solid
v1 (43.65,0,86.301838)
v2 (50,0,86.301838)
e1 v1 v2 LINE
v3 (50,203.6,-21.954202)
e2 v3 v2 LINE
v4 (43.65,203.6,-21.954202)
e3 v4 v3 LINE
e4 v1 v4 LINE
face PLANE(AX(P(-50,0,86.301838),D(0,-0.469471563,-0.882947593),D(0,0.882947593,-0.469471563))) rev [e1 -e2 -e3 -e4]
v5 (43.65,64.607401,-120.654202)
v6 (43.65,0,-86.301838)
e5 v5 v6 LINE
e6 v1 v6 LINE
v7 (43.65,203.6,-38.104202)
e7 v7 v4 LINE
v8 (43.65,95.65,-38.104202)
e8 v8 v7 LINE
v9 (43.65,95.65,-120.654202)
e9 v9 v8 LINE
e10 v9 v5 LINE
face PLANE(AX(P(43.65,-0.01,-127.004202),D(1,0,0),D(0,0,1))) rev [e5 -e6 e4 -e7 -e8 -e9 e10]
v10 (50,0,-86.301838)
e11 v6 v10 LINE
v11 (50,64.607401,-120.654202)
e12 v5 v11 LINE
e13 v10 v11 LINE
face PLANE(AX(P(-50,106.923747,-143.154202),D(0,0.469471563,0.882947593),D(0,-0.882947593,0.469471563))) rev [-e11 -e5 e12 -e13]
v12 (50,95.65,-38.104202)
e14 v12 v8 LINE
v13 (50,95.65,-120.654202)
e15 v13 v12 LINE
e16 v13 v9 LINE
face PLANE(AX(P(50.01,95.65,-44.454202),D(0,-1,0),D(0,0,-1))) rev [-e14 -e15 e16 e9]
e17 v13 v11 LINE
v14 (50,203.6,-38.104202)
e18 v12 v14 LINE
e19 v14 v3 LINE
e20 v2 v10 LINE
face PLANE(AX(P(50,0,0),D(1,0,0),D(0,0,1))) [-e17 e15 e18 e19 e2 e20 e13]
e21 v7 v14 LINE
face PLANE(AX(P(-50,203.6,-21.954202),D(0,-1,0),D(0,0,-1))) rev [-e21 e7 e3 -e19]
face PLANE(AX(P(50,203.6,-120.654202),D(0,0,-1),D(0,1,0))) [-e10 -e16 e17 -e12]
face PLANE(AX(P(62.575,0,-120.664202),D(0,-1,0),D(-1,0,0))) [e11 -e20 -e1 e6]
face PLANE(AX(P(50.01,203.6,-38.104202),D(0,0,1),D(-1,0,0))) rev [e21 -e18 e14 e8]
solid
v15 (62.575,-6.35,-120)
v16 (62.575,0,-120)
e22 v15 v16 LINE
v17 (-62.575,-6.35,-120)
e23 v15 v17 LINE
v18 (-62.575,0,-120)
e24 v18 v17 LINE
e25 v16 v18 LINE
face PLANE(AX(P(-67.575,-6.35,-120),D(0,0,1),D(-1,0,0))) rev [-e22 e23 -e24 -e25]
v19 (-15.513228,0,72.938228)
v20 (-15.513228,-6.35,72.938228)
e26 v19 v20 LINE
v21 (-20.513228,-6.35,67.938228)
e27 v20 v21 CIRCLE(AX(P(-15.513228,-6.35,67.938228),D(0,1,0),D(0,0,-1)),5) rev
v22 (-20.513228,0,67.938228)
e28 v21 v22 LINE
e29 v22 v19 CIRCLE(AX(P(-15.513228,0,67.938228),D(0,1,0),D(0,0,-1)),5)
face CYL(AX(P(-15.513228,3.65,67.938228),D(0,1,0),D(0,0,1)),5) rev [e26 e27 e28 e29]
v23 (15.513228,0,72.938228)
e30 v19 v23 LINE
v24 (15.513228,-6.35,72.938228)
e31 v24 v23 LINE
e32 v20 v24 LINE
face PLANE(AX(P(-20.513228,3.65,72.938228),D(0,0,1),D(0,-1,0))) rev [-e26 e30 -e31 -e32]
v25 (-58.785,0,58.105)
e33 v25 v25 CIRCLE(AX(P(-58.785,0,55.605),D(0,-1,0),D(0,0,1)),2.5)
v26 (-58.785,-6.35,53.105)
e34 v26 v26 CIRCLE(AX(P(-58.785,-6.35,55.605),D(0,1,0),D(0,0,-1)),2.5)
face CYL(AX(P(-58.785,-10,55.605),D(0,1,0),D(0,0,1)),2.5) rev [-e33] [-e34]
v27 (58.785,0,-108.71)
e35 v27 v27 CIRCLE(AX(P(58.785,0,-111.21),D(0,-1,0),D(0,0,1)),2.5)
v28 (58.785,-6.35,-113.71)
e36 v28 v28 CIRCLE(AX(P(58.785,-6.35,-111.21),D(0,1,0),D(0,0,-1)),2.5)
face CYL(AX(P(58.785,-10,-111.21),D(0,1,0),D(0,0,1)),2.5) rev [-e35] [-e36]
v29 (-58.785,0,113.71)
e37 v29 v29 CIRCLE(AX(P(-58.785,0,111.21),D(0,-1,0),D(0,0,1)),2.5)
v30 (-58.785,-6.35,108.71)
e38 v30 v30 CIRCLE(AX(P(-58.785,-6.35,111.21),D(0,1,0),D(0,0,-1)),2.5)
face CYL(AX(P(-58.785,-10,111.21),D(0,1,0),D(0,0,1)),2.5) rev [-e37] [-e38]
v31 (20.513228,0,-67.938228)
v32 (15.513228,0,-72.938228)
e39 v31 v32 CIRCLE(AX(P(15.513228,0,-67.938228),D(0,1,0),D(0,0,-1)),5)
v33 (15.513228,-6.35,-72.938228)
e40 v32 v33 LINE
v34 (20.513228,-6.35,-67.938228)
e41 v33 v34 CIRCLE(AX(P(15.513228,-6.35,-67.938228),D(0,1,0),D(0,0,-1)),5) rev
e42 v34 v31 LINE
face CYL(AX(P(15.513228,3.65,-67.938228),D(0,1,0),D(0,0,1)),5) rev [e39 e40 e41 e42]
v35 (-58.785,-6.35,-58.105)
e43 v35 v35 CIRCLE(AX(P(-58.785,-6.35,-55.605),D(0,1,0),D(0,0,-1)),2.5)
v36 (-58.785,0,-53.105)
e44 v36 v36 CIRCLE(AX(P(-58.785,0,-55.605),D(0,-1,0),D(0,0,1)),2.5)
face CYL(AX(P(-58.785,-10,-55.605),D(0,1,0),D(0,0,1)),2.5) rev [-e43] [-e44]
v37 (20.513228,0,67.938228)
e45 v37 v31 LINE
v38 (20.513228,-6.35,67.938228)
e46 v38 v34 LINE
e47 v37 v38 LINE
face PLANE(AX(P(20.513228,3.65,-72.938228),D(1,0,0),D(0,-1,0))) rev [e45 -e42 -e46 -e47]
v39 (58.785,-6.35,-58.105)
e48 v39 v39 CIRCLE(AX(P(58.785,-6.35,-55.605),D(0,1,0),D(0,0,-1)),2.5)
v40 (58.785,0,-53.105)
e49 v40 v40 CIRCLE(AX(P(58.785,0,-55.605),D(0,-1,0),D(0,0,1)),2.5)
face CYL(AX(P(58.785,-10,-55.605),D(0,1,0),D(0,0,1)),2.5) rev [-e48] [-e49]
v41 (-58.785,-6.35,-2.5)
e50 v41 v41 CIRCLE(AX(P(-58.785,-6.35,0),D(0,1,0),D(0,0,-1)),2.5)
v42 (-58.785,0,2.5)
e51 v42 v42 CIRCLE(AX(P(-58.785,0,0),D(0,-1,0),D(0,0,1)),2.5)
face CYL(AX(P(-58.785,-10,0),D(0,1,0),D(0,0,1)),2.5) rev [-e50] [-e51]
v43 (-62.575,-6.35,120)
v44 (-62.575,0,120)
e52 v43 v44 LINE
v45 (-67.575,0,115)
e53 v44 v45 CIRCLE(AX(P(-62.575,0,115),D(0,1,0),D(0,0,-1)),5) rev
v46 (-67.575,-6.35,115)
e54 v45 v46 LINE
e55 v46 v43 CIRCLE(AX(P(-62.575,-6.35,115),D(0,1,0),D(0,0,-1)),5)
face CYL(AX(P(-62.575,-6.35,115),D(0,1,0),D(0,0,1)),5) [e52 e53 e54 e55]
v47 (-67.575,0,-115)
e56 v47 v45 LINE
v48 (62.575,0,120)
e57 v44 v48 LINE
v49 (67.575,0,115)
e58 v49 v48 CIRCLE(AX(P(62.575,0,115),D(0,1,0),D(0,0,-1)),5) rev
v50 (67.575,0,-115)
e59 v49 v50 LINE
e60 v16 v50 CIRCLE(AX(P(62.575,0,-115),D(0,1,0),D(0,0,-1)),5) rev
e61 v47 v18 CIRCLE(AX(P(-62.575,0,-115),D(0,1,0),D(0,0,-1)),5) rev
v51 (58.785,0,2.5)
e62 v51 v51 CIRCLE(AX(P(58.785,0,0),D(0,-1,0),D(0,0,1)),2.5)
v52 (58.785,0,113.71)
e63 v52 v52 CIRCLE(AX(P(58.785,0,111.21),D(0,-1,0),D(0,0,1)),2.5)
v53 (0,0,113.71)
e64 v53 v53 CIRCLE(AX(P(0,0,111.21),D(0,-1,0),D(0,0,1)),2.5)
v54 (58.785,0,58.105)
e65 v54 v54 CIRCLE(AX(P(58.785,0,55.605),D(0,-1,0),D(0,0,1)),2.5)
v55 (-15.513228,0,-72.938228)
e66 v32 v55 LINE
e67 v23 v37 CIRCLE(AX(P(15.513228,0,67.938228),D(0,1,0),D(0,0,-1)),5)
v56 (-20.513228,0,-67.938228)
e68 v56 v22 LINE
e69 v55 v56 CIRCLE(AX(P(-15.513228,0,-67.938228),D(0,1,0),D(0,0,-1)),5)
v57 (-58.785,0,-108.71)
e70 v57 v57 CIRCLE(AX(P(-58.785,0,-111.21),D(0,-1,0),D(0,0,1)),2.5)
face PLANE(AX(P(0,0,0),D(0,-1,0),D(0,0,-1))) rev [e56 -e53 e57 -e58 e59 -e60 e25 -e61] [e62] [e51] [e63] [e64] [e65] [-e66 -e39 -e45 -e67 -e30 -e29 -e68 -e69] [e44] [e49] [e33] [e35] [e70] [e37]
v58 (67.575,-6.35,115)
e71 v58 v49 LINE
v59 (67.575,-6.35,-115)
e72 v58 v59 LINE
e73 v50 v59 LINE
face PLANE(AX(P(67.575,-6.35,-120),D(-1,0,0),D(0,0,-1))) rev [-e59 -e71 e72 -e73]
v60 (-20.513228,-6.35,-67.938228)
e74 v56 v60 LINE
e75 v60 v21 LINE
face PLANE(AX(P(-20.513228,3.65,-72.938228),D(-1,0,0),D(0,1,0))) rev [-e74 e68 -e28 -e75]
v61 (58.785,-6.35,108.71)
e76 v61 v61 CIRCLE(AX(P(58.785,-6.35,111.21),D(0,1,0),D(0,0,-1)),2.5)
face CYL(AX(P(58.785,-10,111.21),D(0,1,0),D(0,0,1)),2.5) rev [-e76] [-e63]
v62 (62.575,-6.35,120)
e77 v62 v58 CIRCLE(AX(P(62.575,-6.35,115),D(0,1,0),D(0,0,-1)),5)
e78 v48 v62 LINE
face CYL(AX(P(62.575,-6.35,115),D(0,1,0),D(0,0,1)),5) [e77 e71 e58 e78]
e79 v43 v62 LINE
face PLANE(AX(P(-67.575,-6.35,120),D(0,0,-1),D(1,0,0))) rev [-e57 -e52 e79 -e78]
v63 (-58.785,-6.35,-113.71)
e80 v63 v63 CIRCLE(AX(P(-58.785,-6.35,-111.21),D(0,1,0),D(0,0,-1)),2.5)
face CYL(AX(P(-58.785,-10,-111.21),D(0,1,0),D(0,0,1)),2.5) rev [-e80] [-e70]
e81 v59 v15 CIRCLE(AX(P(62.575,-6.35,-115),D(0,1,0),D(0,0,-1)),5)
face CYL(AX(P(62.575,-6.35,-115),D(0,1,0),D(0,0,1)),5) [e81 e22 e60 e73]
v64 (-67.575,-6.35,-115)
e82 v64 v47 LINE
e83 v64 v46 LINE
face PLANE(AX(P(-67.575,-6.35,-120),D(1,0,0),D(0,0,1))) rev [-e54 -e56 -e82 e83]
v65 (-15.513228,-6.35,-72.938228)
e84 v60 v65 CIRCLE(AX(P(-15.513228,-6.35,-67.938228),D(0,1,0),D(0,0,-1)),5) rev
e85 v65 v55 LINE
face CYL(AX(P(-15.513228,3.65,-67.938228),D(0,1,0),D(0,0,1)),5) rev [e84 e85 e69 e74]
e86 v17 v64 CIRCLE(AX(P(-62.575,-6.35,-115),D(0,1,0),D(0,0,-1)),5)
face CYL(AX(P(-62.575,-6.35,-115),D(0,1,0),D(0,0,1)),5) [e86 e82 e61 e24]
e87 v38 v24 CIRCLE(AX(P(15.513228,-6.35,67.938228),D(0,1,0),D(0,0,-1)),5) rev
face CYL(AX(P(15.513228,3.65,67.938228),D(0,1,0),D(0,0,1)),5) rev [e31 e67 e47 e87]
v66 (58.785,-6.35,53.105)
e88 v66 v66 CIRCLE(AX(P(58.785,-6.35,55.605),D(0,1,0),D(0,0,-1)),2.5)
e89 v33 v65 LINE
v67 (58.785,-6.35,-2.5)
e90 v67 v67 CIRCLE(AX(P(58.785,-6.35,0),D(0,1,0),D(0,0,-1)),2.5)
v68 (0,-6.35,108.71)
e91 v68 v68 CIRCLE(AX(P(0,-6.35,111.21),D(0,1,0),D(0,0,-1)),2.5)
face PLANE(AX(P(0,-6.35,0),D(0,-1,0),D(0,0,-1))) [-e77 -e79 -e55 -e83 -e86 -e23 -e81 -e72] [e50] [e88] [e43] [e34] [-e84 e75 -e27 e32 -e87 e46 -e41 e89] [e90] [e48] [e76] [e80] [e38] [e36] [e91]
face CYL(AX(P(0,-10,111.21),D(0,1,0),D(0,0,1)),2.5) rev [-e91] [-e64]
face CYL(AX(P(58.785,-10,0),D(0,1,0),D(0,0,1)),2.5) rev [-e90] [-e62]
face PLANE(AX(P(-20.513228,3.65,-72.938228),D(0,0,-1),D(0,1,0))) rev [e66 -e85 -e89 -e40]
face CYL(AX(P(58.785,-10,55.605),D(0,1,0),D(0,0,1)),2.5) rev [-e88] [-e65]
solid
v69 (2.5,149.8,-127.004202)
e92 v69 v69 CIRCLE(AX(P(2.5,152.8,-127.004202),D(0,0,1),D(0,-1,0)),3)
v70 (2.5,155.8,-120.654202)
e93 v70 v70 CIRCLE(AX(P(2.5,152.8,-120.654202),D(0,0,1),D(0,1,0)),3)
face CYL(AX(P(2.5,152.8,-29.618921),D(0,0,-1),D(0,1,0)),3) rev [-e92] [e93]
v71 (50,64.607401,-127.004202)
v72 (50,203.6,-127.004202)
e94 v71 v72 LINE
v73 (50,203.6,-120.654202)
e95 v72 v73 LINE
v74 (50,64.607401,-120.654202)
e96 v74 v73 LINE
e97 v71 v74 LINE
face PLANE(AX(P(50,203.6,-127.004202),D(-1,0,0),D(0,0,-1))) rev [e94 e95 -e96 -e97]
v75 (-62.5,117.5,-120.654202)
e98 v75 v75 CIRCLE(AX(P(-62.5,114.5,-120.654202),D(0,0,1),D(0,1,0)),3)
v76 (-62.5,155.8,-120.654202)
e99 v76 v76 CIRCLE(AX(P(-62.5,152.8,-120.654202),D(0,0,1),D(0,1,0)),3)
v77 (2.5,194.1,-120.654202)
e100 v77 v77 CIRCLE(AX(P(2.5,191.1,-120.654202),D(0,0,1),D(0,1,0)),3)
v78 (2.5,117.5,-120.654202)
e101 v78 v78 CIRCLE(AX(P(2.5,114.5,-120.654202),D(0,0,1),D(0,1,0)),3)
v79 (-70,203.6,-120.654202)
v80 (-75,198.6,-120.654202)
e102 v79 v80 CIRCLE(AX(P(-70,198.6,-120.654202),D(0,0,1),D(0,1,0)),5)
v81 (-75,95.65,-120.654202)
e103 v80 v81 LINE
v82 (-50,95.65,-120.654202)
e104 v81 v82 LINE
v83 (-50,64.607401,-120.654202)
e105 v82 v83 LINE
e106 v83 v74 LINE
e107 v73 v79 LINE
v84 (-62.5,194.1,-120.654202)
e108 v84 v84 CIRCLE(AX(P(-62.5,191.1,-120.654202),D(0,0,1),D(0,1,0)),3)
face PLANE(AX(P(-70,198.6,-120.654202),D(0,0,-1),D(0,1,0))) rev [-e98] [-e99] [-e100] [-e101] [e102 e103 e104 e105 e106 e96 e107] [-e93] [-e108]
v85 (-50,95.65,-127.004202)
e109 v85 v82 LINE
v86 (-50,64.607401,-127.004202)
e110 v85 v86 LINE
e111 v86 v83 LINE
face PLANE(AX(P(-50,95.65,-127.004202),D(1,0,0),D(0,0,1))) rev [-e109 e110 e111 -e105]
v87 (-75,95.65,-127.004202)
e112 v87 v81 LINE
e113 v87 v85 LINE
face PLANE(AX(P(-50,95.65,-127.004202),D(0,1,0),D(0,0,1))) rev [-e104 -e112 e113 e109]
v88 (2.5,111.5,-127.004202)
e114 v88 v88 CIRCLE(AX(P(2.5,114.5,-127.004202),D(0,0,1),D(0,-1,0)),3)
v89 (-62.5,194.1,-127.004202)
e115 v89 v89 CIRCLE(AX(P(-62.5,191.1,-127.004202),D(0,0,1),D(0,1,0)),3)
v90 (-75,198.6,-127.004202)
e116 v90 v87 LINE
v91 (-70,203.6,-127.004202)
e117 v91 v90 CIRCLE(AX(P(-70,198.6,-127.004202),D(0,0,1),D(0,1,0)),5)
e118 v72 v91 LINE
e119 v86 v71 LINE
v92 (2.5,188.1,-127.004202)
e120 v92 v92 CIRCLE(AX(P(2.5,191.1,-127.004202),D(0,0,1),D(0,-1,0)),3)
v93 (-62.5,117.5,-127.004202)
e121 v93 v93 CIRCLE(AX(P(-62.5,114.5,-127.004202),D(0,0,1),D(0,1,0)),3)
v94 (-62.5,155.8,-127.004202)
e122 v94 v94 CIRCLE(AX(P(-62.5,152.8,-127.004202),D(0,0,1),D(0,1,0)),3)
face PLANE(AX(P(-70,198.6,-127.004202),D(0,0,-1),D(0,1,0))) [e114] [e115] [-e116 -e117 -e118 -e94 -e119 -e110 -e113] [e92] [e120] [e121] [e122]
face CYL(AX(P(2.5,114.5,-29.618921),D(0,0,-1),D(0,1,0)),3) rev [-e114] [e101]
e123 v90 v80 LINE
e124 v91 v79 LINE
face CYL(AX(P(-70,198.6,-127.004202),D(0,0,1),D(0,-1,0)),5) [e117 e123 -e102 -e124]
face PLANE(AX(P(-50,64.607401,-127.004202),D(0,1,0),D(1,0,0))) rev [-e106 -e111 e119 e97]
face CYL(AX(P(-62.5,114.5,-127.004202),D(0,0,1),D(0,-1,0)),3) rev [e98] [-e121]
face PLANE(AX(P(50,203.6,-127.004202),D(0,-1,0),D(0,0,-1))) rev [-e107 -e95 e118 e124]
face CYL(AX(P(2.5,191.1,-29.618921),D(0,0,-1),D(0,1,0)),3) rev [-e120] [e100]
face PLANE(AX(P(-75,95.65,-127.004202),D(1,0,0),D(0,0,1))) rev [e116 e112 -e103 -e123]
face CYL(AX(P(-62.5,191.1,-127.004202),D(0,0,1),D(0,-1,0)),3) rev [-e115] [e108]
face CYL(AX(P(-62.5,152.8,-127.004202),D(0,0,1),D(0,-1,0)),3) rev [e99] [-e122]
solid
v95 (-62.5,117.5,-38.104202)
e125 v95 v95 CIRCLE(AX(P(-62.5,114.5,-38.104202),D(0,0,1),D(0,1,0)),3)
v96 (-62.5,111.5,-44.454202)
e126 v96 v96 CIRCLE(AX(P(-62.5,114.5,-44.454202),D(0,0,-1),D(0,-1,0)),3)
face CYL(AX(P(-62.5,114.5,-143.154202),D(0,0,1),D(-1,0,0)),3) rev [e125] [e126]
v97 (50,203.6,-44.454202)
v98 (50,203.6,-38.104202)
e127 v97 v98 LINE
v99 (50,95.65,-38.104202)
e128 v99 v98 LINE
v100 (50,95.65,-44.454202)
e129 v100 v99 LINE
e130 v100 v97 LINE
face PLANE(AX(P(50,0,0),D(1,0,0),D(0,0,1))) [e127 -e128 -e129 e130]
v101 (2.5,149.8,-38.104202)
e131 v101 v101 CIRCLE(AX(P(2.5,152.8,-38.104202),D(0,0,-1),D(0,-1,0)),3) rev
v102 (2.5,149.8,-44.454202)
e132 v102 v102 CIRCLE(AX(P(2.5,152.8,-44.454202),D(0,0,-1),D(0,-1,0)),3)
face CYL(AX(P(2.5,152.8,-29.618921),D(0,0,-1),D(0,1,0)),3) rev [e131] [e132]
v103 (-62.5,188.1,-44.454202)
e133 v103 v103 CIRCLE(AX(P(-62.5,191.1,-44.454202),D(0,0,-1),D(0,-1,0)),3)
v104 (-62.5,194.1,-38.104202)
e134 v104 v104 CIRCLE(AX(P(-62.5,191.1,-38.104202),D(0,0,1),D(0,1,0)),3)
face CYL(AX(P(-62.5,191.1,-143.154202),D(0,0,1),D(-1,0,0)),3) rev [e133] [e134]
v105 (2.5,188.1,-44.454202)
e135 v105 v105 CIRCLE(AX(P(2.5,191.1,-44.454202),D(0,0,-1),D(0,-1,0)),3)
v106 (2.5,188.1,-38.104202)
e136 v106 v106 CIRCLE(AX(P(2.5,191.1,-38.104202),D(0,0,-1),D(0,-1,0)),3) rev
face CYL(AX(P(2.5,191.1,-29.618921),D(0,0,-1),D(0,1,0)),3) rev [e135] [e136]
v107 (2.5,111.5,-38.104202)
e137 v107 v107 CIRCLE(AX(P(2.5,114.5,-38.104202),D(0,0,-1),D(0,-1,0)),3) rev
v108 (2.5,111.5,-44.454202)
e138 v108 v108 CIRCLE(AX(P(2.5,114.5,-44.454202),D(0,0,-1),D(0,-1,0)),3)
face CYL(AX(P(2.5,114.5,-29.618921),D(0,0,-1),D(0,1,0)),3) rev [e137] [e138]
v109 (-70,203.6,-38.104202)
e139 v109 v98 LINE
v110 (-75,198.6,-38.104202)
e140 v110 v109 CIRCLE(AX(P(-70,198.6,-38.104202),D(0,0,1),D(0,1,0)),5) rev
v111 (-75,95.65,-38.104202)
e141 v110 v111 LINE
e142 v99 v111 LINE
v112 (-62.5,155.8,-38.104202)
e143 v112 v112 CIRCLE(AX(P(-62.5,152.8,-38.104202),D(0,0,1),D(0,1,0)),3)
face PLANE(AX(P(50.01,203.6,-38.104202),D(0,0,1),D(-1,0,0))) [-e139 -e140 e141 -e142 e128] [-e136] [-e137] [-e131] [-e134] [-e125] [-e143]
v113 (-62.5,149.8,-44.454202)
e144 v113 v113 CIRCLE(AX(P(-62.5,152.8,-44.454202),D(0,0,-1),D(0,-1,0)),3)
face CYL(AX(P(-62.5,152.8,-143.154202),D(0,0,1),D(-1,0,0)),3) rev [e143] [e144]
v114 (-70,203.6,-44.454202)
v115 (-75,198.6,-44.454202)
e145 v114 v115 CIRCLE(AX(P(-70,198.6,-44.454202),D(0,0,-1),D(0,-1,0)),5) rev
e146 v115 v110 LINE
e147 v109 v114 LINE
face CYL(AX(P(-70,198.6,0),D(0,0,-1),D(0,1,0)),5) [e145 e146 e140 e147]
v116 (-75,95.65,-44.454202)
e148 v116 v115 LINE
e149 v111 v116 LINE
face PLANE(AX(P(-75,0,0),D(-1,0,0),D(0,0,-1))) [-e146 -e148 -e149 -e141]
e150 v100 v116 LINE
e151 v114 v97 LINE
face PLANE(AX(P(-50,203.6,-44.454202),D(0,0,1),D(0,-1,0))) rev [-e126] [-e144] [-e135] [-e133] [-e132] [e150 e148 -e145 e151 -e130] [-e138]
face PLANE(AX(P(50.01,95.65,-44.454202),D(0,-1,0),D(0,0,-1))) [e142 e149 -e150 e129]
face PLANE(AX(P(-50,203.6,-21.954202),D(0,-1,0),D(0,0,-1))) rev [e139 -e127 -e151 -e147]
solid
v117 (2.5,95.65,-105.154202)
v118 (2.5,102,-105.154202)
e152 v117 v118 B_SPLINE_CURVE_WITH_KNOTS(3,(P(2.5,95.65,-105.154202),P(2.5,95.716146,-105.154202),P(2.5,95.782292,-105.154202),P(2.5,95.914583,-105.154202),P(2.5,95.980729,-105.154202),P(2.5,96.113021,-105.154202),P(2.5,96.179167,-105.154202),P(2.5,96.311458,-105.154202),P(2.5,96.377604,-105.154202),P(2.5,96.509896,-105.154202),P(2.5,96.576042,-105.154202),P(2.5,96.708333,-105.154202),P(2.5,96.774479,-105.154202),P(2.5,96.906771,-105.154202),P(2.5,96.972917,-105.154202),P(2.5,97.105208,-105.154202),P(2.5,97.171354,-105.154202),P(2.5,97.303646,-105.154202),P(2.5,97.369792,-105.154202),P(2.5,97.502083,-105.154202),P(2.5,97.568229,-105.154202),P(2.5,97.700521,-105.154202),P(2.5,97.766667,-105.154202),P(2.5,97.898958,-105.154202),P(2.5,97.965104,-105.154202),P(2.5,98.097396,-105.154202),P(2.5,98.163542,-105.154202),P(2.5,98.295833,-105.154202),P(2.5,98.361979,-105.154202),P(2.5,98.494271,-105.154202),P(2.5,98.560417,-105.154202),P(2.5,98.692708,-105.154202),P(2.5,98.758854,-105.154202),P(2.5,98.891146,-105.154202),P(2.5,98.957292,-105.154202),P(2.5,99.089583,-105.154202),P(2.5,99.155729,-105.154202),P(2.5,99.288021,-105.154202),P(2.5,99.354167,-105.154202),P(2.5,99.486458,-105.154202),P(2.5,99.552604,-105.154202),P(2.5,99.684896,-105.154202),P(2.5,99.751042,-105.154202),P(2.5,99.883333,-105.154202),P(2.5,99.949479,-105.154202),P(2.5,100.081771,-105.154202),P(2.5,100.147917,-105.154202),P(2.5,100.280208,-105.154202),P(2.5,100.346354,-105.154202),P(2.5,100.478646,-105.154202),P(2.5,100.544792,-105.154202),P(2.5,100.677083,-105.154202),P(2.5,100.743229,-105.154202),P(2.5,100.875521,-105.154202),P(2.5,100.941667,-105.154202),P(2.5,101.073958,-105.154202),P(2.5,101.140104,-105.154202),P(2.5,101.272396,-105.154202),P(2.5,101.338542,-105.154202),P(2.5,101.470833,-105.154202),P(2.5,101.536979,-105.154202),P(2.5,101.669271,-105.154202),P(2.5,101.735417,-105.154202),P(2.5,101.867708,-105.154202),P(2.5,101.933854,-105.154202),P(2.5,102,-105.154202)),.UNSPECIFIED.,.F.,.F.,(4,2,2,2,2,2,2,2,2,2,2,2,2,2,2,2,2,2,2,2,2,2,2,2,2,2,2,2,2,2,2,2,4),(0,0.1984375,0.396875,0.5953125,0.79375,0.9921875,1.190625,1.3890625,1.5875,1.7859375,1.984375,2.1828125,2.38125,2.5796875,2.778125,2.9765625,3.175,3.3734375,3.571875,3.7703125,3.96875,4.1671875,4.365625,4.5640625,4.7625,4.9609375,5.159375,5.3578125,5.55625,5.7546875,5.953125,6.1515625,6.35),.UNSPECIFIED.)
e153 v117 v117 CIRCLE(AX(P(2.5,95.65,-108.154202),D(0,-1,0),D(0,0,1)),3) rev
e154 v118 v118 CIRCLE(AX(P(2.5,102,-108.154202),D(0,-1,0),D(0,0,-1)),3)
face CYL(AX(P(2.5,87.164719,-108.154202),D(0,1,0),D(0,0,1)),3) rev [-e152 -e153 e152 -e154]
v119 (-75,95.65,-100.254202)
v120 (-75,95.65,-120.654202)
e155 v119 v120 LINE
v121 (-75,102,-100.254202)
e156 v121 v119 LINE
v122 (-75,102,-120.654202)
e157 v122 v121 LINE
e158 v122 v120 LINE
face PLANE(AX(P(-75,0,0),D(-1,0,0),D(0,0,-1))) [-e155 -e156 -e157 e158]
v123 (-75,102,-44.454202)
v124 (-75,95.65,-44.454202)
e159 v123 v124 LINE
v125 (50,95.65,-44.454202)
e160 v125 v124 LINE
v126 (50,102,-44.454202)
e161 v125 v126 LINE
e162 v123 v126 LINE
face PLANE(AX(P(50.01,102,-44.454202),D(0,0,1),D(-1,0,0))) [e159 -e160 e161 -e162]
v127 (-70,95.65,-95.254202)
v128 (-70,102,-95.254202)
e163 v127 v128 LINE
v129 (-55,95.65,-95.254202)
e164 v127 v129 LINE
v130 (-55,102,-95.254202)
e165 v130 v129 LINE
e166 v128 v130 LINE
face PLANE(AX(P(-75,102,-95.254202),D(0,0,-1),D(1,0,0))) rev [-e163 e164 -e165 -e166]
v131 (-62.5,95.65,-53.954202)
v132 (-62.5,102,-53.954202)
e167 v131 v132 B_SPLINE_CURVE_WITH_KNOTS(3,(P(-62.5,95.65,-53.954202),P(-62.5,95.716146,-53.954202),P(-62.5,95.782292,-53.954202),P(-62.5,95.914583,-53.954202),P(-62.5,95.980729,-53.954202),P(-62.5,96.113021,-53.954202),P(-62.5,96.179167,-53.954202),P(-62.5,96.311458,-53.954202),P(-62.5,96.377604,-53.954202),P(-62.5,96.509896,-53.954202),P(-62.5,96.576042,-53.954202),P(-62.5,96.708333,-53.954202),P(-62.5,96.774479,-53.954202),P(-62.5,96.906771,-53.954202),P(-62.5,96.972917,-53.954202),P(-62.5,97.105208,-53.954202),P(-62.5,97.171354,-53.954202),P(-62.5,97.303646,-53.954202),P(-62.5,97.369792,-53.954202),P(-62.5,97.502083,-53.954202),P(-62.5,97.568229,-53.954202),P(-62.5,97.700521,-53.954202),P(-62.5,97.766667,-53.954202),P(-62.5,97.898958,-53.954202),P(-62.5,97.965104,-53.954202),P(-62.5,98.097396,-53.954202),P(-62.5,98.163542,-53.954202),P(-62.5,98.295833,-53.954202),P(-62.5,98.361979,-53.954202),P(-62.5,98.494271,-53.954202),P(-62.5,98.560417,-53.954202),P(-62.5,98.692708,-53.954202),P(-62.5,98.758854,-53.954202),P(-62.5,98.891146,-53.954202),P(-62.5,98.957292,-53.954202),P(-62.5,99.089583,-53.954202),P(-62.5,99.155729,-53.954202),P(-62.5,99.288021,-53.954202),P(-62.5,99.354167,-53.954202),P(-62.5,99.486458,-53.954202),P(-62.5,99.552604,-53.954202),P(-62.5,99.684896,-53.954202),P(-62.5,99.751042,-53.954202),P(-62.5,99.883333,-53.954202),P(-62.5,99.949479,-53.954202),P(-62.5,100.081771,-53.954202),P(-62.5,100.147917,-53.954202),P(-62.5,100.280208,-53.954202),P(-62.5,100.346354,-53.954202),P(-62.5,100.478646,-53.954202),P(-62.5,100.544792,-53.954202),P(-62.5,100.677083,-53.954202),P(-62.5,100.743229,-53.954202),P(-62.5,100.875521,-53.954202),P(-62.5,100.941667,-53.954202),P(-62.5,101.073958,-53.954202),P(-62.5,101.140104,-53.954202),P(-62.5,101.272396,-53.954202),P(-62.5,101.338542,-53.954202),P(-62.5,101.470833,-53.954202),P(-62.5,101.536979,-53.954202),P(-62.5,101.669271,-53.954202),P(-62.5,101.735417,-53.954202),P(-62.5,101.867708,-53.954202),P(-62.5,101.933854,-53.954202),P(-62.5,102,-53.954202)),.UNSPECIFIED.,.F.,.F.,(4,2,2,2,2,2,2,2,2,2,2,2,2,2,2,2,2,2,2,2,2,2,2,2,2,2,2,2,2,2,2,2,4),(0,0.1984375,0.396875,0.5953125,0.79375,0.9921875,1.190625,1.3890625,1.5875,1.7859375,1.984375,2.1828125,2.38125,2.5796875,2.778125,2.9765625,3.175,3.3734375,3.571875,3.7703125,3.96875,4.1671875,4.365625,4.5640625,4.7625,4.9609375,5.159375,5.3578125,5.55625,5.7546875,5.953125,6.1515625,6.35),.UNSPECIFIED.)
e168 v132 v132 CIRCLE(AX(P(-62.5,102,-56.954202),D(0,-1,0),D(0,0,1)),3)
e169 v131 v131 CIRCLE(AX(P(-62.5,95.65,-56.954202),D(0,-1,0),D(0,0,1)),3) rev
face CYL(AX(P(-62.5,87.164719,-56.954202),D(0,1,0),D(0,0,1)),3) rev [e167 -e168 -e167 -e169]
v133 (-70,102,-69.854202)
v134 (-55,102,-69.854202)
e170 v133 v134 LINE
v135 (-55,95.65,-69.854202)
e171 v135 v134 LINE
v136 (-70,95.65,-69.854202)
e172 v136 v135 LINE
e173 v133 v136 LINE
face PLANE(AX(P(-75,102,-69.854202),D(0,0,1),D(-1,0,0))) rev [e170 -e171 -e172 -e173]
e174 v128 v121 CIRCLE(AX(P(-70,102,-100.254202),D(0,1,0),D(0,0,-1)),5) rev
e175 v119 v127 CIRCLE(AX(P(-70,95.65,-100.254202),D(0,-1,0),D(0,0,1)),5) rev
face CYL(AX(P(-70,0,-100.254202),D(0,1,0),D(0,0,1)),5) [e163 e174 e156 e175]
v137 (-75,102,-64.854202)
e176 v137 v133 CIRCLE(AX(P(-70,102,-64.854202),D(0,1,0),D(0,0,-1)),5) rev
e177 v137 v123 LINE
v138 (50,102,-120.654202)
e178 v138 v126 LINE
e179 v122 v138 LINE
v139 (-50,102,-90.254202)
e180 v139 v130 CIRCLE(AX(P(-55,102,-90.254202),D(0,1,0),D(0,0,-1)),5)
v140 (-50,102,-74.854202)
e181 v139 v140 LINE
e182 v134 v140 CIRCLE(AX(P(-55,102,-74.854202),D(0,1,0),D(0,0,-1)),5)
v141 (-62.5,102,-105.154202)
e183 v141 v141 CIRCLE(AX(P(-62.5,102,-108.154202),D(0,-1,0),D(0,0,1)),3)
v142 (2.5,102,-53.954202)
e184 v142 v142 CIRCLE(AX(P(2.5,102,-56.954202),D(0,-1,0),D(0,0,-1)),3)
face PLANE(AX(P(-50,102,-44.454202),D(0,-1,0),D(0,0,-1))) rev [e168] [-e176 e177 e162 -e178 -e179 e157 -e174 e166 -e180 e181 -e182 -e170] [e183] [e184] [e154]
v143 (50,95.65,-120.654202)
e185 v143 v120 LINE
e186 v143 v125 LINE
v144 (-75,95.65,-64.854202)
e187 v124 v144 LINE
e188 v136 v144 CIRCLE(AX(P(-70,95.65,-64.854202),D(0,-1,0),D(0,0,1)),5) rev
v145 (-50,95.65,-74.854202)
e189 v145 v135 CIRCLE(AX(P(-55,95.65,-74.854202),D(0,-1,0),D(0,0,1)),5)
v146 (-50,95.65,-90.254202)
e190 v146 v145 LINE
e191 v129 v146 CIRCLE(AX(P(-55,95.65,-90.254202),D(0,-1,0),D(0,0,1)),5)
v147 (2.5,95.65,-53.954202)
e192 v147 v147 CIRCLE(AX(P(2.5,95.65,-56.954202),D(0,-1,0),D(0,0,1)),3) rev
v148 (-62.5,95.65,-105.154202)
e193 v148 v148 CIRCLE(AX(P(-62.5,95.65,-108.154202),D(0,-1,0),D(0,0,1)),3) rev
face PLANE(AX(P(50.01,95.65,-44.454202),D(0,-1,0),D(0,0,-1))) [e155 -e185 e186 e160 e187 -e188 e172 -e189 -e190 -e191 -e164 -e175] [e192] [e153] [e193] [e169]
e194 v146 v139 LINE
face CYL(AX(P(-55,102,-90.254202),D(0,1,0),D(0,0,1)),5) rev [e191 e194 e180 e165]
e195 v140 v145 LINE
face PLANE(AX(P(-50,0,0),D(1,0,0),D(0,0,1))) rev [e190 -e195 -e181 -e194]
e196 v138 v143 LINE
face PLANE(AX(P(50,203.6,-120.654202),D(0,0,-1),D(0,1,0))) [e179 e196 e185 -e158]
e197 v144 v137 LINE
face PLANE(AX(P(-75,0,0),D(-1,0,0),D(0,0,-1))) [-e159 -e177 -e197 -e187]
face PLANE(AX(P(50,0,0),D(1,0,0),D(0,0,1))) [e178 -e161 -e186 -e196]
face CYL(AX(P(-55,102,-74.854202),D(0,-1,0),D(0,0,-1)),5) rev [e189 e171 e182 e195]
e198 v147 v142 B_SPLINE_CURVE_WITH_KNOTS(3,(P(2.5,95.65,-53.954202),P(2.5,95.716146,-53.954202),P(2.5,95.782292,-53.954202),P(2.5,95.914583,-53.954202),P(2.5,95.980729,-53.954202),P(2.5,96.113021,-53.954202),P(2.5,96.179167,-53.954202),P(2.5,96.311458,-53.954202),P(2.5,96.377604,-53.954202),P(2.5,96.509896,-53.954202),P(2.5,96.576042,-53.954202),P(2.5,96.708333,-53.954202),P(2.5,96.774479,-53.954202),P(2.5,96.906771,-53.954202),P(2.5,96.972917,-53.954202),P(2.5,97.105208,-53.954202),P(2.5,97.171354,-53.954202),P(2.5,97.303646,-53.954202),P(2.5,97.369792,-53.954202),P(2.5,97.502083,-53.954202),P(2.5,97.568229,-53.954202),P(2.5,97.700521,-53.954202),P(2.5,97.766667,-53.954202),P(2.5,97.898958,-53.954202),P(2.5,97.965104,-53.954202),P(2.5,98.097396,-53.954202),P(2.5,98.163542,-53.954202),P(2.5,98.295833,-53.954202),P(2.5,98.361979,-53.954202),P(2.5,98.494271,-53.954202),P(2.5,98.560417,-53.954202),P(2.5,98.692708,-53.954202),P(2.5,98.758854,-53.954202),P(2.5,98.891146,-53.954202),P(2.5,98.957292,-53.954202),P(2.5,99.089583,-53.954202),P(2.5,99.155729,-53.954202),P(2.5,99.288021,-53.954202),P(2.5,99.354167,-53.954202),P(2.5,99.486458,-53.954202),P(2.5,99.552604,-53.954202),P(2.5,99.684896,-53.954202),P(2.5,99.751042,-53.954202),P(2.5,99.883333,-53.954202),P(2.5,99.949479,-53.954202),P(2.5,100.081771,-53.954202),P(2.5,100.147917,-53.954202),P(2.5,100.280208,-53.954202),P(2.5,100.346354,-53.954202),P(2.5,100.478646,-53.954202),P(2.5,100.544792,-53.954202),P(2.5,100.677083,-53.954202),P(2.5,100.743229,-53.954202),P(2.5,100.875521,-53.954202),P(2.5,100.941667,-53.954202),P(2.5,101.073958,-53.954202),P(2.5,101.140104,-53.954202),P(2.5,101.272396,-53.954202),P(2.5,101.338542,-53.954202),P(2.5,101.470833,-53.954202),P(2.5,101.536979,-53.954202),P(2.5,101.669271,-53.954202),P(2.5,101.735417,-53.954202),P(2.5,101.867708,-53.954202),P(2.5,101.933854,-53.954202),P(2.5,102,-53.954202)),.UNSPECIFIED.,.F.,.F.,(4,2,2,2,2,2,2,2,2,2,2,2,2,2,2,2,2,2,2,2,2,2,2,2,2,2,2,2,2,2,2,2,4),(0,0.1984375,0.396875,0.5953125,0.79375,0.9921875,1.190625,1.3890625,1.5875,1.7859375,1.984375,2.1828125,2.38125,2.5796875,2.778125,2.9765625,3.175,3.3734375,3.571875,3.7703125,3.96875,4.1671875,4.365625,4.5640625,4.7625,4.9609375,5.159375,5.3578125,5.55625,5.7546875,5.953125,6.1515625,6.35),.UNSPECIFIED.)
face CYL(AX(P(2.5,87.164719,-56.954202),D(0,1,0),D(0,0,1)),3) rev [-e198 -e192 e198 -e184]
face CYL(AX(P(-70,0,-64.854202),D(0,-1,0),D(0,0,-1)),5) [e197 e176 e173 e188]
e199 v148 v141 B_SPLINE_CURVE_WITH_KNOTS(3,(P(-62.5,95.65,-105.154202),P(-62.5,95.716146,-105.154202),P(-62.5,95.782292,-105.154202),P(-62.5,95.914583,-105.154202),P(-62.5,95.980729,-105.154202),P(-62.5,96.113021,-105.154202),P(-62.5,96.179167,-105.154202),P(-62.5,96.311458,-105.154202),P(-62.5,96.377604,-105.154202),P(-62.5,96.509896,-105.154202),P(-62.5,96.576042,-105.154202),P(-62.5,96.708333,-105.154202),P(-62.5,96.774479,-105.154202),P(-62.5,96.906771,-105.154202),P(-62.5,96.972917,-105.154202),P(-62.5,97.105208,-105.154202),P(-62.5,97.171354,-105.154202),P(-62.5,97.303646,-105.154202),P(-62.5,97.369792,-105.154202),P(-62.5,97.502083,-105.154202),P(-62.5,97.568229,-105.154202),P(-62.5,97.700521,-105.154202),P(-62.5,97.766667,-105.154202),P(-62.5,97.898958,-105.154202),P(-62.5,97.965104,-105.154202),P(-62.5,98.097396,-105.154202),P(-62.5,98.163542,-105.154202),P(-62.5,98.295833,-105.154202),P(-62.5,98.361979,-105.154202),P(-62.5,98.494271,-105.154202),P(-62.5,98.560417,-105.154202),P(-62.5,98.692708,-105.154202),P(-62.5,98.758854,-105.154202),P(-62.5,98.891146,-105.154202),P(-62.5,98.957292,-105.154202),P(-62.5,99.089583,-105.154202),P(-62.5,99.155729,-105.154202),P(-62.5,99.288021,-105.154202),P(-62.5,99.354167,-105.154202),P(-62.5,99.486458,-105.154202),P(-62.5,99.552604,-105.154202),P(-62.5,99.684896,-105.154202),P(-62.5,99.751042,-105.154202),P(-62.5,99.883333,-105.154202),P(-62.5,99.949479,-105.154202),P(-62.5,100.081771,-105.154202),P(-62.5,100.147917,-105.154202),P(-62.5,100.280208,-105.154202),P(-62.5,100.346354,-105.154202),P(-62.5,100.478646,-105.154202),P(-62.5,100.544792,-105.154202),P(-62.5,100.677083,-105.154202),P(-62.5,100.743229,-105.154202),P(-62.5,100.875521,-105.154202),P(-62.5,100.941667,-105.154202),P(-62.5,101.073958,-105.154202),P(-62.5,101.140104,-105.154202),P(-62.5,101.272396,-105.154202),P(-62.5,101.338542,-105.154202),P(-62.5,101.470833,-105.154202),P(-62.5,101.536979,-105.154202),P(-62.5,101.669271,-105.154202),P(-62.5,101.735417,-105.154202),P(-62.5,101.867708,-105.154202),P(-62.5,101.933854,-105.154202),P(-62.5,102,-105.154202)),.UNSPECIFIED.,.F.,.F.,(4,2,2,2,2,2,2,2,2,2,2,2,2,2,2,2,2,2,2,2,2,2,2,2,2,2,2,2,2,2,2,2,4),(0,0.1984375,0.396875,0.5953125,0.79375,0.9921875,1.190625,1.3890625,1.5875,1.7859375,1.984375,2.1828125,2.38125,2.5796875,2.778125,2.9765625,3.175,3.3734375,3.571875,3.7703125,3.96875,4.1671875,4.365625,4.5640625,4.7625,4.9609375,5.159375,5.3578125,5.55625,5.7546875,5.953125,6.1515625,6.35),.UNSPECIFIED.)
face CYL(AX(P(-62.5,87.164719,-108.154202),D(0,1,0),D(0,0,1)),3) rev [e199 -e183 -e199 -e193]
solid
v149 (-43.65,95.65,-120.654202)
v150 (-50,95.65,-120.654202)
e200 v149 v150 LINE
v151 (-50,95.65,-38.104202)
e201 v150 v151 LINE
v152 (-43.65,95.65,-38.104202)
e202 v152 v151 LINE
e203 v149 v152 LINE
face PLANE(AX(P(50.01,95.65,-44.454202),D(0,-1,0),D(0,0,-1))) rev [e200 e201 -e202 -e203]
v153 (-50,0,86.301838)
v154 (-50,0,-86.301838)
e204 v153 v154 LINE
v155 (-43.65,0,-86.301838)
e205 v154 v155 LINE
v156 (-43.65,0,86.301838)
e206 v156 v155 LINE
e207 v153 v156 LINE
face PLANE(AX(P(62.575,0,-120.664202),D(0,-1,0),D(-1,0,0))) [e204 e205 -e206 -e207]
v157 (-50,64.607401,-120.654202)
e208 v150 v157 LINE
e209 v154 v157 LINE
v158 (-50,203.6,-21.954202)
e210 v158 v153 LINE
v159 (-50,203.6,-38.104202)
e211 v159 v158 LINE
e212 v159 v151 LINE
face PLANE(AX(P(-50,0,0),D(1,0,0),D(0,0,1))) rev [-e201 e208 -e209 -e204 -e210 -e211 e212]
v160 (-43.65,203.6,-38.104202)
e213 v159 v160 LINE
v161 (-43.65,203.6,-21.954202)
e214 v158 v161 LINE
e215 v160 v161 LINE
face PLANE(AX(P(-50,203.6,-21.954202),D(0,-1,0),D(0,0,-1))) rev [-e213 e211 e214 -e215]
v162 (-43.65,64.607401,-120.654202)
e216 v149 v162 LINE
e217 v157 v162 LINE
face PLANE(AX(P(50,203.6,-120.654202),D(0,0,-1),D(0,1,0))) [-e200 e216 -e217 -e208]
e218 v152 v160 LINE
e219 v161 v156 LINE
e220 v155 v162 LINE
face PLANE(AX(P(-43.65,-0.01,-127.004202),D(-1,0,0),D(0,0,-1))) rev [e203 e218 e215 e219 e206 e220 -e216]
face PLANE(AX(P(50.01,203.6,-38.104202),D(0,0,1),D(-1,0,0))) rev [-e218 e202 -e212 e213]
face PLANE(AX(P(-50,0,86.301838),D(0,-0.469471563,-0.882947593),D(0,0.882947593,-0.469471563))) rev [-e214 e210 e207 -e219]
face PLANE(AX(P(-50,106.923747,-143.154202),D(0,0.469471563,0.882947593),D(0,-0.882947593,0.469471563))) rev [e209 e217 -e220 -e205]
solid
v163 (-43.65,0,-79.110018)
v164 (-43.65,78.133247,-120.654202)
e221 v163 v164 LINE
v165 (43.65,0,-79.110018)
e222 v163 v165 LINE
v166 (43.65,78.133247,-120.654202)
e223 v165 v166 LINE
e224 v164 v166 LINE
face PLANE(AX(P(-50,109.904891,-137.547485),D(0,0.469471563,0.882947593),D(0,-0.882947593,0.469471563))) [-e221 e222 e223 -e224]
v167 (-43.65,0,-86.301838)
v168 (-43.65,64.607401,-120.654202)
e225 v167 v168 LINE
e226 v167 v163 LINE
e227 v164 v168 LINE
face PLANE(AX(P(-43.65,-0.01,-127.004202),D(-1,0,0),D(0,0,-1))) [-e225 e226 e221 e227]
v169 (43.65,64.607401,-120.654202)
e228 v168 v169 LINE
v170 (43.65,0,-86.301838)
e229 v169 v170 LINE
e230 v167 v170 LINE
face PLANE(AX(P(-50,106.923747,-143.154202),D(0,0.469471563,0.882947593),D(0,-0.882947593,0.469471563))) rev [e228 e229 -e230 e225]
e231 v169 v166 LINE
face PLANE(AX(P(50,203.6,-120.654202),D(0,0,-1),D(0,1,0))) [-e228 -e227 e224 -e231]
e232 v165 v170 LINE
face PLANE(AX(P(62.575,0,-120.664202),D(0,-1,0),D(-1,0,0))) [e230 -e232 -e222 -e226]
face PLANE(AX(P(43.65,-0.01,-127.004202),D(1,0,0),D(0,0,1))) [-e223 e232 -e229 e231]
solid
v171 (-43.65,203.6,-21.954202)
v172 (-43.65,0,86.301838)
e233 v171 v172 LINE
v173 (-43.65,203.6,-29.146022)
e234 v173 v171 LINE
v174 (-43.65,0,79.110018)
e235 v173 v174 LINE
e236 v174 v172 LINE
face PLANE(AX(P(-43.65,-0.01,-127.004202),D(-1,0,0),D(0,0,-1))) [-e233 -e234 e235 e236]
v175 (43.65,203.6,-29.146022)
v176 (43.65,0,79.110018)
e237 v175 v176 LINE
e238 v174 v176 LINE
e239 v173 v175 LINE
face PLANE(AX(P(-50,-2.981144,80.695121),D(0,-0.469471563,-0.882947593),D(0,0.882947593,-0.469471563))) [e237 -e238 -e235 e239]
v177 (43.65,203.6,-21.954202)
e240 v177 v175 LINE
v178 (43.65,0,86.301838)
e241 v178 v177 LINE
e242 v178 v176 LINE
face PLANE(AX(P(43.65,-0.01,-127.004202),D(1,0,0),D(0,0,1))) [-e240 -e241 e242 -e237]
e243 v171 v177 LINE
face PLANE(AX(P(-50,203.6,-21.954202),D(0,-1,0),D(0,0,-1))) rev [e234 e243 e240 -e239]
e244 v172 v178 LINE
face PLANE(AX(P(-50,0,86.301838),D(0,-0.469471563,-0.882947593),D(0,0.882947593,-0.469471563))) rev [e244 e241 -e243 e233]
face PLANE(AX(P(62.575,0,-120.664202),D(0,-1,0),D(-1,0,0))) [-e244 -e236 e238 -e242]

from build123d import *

# Parameters (mm, degrees)
BOSS_EXTRUDE1_DEPTH     = 50
SHELL1_T                = -6.35
BOSS_EXTRUDE2_DEPTH     = 25
SKETCH4_W               = 135.15
SKETCH4_H               = 240
BOSS_EXTRUDE3_DEPTH     = 6.35
SKETCH7_W               = 41.026455608
SKETCH7_H               = 145.876455608
CUT_EXTRUDE3_DEPTH      = 10
FILLET1_R               = 5
SKETCH5_R               = 2.5
CUT_EXTRUDE2_DEPTH      = 10
CUT_EXTRUDE4_DEPTH      = 269.467686741
CUT_EXTRUDE4_DEPTH_BACK = 269.467686741
SKETCH8_R               = 3
SKETCH16_W              = 125
SKETCH16_H              = 22.5
CUT_EXTRUDE5_DEPTH      = 260.944389575
SKETCH17_R              = 3
BOSS_EXTRUDE4_DEPTH     = 6.35
CUT_EXTRUDE6_START      = -88.9
SKETCH18_R              = 3
CUT_EXTRUDE6_DEPTH      = 88.9
SKETCH20_R              = 3
CUT_EXTRUDE7_DEPTH      = 6.35
FILLET2_R               = 5
SPLIT1_SURFACE_1_BACK   = 355.144
SPLIT1_SURFACE_1_DEPTH  = 710.288
SPLIT1_SURFACE_2_BACK   = 355.144
SPLIT1_SURFACE_2_DEPTH  = 710.288
SPLIT2_SURFACE_3_BACK   = 355.144
SPLIT2_SURFACE_3_DEPTH  = 710.288
SPLIT2_SURFACE_4_BACK   = 355.144
SPLIT2_SURFACE_4_DEPTH  = 710.288
SPLIT6_SURFACE_5_BACK   = 355.144
SPLIT6_SURFACE_5_DEPTH  = 710.288
SPLIT6_SURFACE_6_BACK   = 355.144
SPLIT6_SURFACE_6_DEPTH  = 710.288
SPLIT4_SURFACE_7_BACK   = 355.144
SPLIT4_SURFACE_7_DEPTH  = 710.288
SPLIT4_SURFACE_8_BACK   = 355.144
SPLIT4_SURFACE_8_DEPTH  = 710.288


# Read off the part's stored shape, not the designer's step: Body-Delete/Keep 2
with BuildPart() as part:
    # Sketch1 → Boss-Extrude1 (new, symmetric)
    with BuildSketch(Plane(origin=(0, 0, 0), x_dir=(0, 0, -1), z_dir=(1, 0, 0))):
        Polygon((86.301837863, 0), (-86.301837863, 0), (21.954202424, 203.6), (44.454202424, 203.6), (44.454202424, 102), (120.654202424, 102), (120.654202424, 203.6), (143.154202424, 203.6), (143.154202424, 106.923746648), align=None)
    extrude(amount=BOSS_EXTRUDE1_DEPTH, both=True)

    # Shell1
    shell1_openings = [part.faces().sort_by_distance(p)[0] for p in [
        (0, 0, 0),
        (0, 203.6, -33.204202424),
        (0, 203.6, -131.904202424),
    ]]
    offset(amount=SHELL1_T, openings=shell1_openings, kind=Kind.INTERSECTION)

    # Sketch3 → Boss-Extrude2 (add)
    with BuildSketch(Plane(origin=(50, 0, 0), x_dir=(0, 0, -1), z_dir=(1, 0, 0))):
        Polygon((44.454202424, 203.6), (38.104202424, 203.6), (38.104202424, 95.65), (69.854202424, 95.65), (69.854202424, 102), (44.454202424, 102), align=None)
        Polygon((120.654202424, 203.6), (127.004202424, 203.6), (127.004202424, 95.65), (95.254202424, 95.65), (95.254202424, 102), (120.654202424, 102), align=None)
    extrude(amount=BOSS_EXTRUDE2_DEPTH)

    # Sketch4 → Boss-Extrude3 (add)
    with BuildSketch(Plane.XZ):
        Rectangle(SKETCH4_W, SKETCH4_H)
    extrude(amount=BOSS_EXTRUDE3_DEPTH)

    # Sketch7 → Cut-Extrude3 (cut)
    with BuildSketch(Plane.XZ.offset(6.35)):
        Rectangle(SKETCH7_W, SKETCH7_H)
    extrude(amount=-CUT_EXTRUDE3_DEPTH, mode=Mode.SUBTRACT)

    # Fillet1
    fillet1_edges = [part.edges().sort_by_distance(p)[0] for p in [
        (-20.513227804, -3.175, -72.938227804),
        (-20.513227804, -3.175, 72.938227804),
        (20.513227804, -3.175, 72.938227804),
        (20.513227804, -3.175, -72.938227804),
        (75, 203.6, -41.279202424),
        (75, 203.6, -123.829202424),
        (-67.575, -3.175, 120),
        (-67.575, -3.175, -120),
        (67.575, -3.175, -120),
        (67.575, -3.175, 120),
    ]]
    fillet(fillet1_edges, radius=FILLET1_R)

    # Sketch5 → Cut-Extrude2 (cut)
    with BuildSketch(Plane(origin=(0, 0, 0), x_dir=(1, 0, 0), z_dir=(0, 1, 0))):
        with Locations(Location((-58.785, -111.21, 0), (0, 0, 270))):
            Circle(SKETCH5_R)
        with Locations(Location((0, -111.21, 0), (0, 0, 270))):
            Circle(SKETCH5_R)
        with Locations(Location((58.785, -111.21, 0), (0, 0, 270))):
            Circle(SKETCH5_R)
        with Locations(Location((58.785, -55.605, 0), (0, 0, 270))):
            Circle(SKETCH5_R)
        with Locations(Location((-58.785, -55.605, 0), (0, 0, 270))):
            Circle(SKETCH5_R)
        with Locations(Location((-58.785, 0, 0), (0, 0, 270))):
            Circle(SKETCH5_R)
        with Locations(Location((58.785, 0, 0), (0, 0, 270))):
            Circle(SKETCH5_R)
        with Locations(Location((58.785, 55.605, 0), (0, 0, 270))):
            Circle(SKETCH5_R)
        with Locations(Location((-58.785, 55.605, 0), (0, 0, 270))):
            Circle(SKETCH5_R)
        with Locations(Location((-58.785, 111.21, 0), (0, 0, 270))):
            Circle(SKETCH5_R)
        with Locations(Location((58.785, 111.21, 0), (0, 0, 270))):
            Circle(SKETCH5_R)
    extrude(amount=-CUT_EXTRUDE2_DEPTH, mode=Mode.SUBTRACT)

    # Sketch8 → Cut-Extrude4 (cut, two sides: drawn at the far end of the back side and taken through both)
    with BuildSketch(Plane.XY.offset(-38.104202424).offset(-CUT_EXTRUDE4_DEPTH_BACK)):
        with Locations(Location((62.5, 152.8, 0), (0, 0, 270))):
            Circle(SKETCH8_R)
        with Locations(Location((62.5, 191.1, 0), (0, 0, 270))):
            Circle(SKETCH8_R)
        with Locations(Location((62.5, 114.5, 0), (0, 0, 270))):
            Circle(SKETCH8_R)
    extrude(amount=CUT_EXTRUDE4_DEPTH + CUT_EXTRUDE4_DEPTH_BACK, mode=Mode.SUBTRACT)

    # Sketch16 → Cut-Extrude5 (cut, through all)
    with BuildSketch(Plane(origin=(0, 0, 0), x_dir=(1, 0, 0), z_dir=(0, 1, 0))):
        with Locations((12.5, 131.904202424)):
            Rectangle(SKETCH16_W, SKETCH16_H)
    extrude(amount=CUT_EXTRUDE5_DEPTH, mode=Mode.SUBTRACT)


with BuildPart() as body_2:
    # Sketch17 → Boss-Extrude4 (new body)
    with BuildSketch(Plane(origin=(0, 0, -120.654202424), x_dir=(-1, 0, 0), z_dir=(0, 0, -1))):
        with BuildLine():
            Line((50, 203.6), (50, 64.607401178))
            Line((50, 64.607401178), (-50, 64.607401178))
            Line((-50, 64.607401178), (-50, 95.65))
            Line((-50, 95.65), (-75, 95.65))
            Line((-75, 95.65), (-75, 198.6))
            ThreePointArc((-75, 198.6), (-73.535533906, 202.135533906), (-70, 203.6))
            Line((-70, 203.6), (50, 203.6))
        make_face()
        with Locations(Location((-62.5, 114.5, 0), (0, 0, 90))):
            Circle(SKETCH17_R, mode=Mode.SUBTRACT)
        with Locations(Location((-62.5, 152.8, 0), (0, 0, 90))):
            Circle(SKETCH17_R, mode=Mode.SUBTRACT)
        with Locations(Location((-62.5, 191.1, 0), (0, 0, 90))):
            Circle(SKETCH17_R, mode=Mode.SUBTRACT)
    extrude(amount=BOSS_EXTRUDE4_DEPTH)


with BuildPart() as cut_extrude6_tool:
    # Sketch18 → Cut-Extrude6 (new body)
    with BuildSketch(Plane(origin=(0, 0, -127.004202424), x_dir=(-1, 0, 0), z_dir=(0, 0, -1)).offset(CUT_EXTRUDE6_START)):
        with Locations(Location((2.5, 191.1, 0), (0, 0, 90))):
            Circle(SKETCH18_R)
        with Locations(Location((2.5, 152.8, 0), (0, 0, 90))):
            Circle(SKETCH18_R)
        with Locations(Location((2.5, 114.5, 0), (0, 0, 90))):
            Circle(SKETCH18_R)
    extrude(amount=CUT_EXTRUDE6_DEPTH)


with BuildPart() as part_1:
    add(part.part)

    # Cut-Extrude6: cut by cut_extrude6_tool
    add(cut_extrude6_tool.part, mode=Mode.SUBTRACT)

    # Sketch20 → Cut-Extrude7 (cut)
    with BuildSketch(Plane(origin=(0, 102, 0), x_dir=(1, 0, 0), z_dir=(0, 1, 0))):
        with Locations(Location((62.5, 108.154202424, 0), (0, 0, 270))):
            Circle(SKETCH20_R)
        with Locations(Location((62.5, 56.954202424, 0), (0, 0, 270))):
            Circle(SKETCH20_R)
        with Locations(Location((-2.5, 56.954202424, 0), (0, 0, 270))):
            Circle(SKETCH20_R)
        with Locations(Location((-2.5, 108.154202424, 0), (0, 0, 270))):
            Circle(SKETCH20_R)
    extrude(amount=-CUT_EXTRUDE7_DEPTH, mode=Mode.SUBTRACT)

    # Fillet2
    fillet2_edges = [part_1.edges().sort_by_distance(p)[0] for p in [
        (50, 98.825, -69.854202424),
        (75, 98.825, -69.854202424),
        (50, 98.825, -95.254202424),
        (75, 98.825, -95.254202424),
    ]]
    fillet(fillet2_edges, radius=FILLET2_R)


with BuildPart() as body_2_1:
    add(body_2.part)

    # Cut-Extrude6: cut by cut_extrude6_tool
    add(cut_extrude6_tool.part, mode=Mode.SUBTRACT)


with BuildPart() as body_3:
    # Split1: the piece behind the surface
    add(part_1.part)
    # Split1 surface: a surface, the sketch's curves swept straight by 710.288 mm
    with BuildLine(Plane.XY.offset(120).offset(-SPLIT1_SURFACE_1_BACK), mode=Mode.PRIVATE) as split1_surface_1_path:
        Line((-62.575, 0), (62.575, 0))
    split1_surface_1 = Shell.extrude(split1_surface_1_path.wire(), (0 * SPLIT1_SURFACE_1_DEPTH, 0 * SPLIT1_SURFACE_1_DEPTH, 1 * SPLIT1_SURFACE_1_DEPTH))
    split(bisect_by=split1_surface_1, keep=Keep.BOTTOM)


with BuildPart() as part_2:
    add(part_1.part)

    # Split1: split by a surface, the side it looks to stays
    # Split1 surface: a surface, the sketch's curves swept straight by 710.288 mm
    with BuildLine(Plane.XY.offset(120).offset(-SPLIT1_SURFACE_2_BACK), mode=Mode.PRIVATE) as split1_surface_2_path:
        Line((-62.575, 0), (62.575, 0))
    split1_surface_2 = Shell.extrude(split1_surface_2_path.wire(), (0 * SPLIT1_SURFACE_2_DEPTH, 0 * SPLIT1_SURFACE_2_DEPTH, 1 * SPLIT1_SURFACE_2_DEPTH))
    split(bisect_by=split1_surface_2, keep=Keep.TOP)


with BuildPart() as body_4:
    # Split2: the piece behind the surface
    add(part_2.part)
    # Split2 surface: a surface, the sketch's curves swept straight by 710.288 mm
    with BuildLine(Plane(origin=(75, 0, 0), x_dir=(0, 0, -1), z_dir=(1, 0, 0)).offset(-SPLIT2_SURFACE_3_BACK), mode=Mode.PRIVATE) as split2_surface_3_path:
        Line((44.454202424, 102), (120.654202424, 102))
        Line((120.654202424, 102), (120.654202424, 95.65))
        Line((120.654202424, 95.65), (44.454202424, 95.65))
        Line((44.454202424, 95.65), (44.454202424, 102))
    split2_surface_3 = Shell.extrude(split2_surface_3_path.wire(), (1 * SPLIT2_SURFACE_3_DEPTH, 0 * SPLIT2_SURFACE_3_DEPTH, 0 * SPLIT2_SURFACE_3_DEPTH))
    split(bisect_by=split2_surface_3, keep=Keep.BOTTOM)


with BuildPart() as part_3:
    add(part_2.part)

    # Split2: split by a surface, the side it looks to stays
    # Split2 surface: a surface, the sketch's curves swept straight by 710.288 mm
    with BuildLine(Plane(origin=(75, 0, 0), x_dir=(0, 0, -1), z_dir=(1, 0, 0)).offset(-SPLIT2_SURFACE_4_BACK), mode=Mode.PRIVATE) as split2_surface_4_path:
        Line((44.454202424, 102), (120.654202424, 102))
        Line((120.654202424, 102), (120.654202424, 95.65))
        Line((120.654202424, 95.65), (44.454202424, 95.65))
        Line((44.454202424, 95.65), (44.454202424, 102))
    split2_surface_4 = Shell.extrude(split2_surface_4_path.wire(), (1 * SPLIT2_SURFACE_4_DEPTH, 0 * SPLIT2_SURFACE_4_DEPTH, 0 * SPLIT2_SURFACE_4_DEPTH))
    split(bisect_by=split2_surface_4, keep=Keep.TOP)


with BuildPart() as body_5:
    # Split6: the piece behind the surface
    add(part_3.part)
    # Split6 surface: a surface, the sketch's curves swept straight by 710.288 mm
    with BuildLine(Plane(origin=(50, 0, 0), x_dir=(0, 0, -1), z_dir=(1, 0, 0)).offset(-SPLIT6_SURFACE_5_BACK), mode=Mode.PRIVATE) as split6_surface_5_path:
        Line((44.454202424, 203.6), (38.104202424, 203.6))
        Line((38.104202424, 203.6), (38.104202424, 95.65))
        Line((38.104202424, 95.65), (44.454202424, 95.65))
        Line((44.454202424, 95.65), (44.454202424, 203.6))
    split6_surface_5 = Shell.extrude(split6_surface_5_path.wire(), (1 * SPLIT6_SURFACE_5_DEPTH, 0 * SPLIT6_SURFACE_5_DEPTH, 0 * SPLIT6_SURFACE_5_DEPTH))
    split(bisect_by=split6_surface_5, keep=Keep.BOTTOM)


with BuildPart() as part_4:
    add(part_3.part)

    # Split6: split by a surface, the side it looks to stays
    # Split6 surface: a surface, the sketch's curves swept straight by 710.288 mm
    with BuildLine(Plane(origin=(50, 0, 0), x_dir=(0, 0, -1), z_dir=(1, 0, 0)).offset(-SPLIT6_SURFACE_6_BACK), mode=Mode.PRIVATE) as split6_surface_6_path:
        Line((44.454202424, 203.6), (38.104202424, 203.6))
        Line((38.104202424, 203.6), (38.104202424, 95.65))
        Line((38.104202424, 95.65), (44.454202424, 95.65))
        Line((44.454202424, 95.65), (44.454202424, 203.6))
    split6_surface_6 = Shell.extrude(split6_surface_6_path.wire(), (1 * SPLIT6_SURFACE_6_DEPTH, 0 * SPLIT6_SURFACE_6_DEPTH, 0 * SPLIT6_SURFACE_6_DEPTH))
    split(bisect_by=split6_surface_6, keep=Keep.TOP)


with BuildPart() as body_6:
    # Split4: the piece behind the surface
    add(body_5.part)
    # Split4 surface: a surface, the sketch's curves swept straight by 710.288 mm
    with BuildLine(Plane(origin=(0, 203.6, 0), x_dir=(1, 0, 0), z_dir=(0, 1, 0)).offset(-SPLIT4_SURFACE_7_BACK), mode=Mode.PRIVATE) as split4_surface_7_path:
        Line((-43.65, 127.004202424), (43.65, 127.004202424))
        Line((43.65, 127.004202424), (43.65, -120))
        Line((43.65, -120), (-43.65, -120))
        Line((-43.65, -120), (-43.65, 127.004202424))
    split4_surface_7 = Shell.extrude(split4_surface_7_path.wire(), (0 * SPLIT4_SURFACE_7_DEPTH, 1 * SPLIT4_SURFACE_7_DEPTH, 0 * SPLIT4_SURFACE_7_DEPTH))
    split(bisect_by=split4_surface_7, keep=Keep.BOTTOM)


with BuildPart() as body_5_1:
    add(body_5.part)

    # Split4: split by a surface, the side it looks to stays
    # Split4 surface: a surface, the sketch's curves swept straight by 710.288 mm
    with BuildLine(Plane(origin=(0, 203.6, 0), x_dir=(1, 0, 0), z_dir=(0, 1, 0)).offset(-SPLIT4_SURFACE_8_BACK), mode=Mode.PRIVATE) as split4_surface_8_path:
        Line((-43.65, 127.004202424), (43.65, 127.004202424))
        Line((43.65, 127.004202424), (43.65, -120))
        Line((43.65, -120), (-43.65, -120))
        Line((-43.65, -120), (-43.65, 127.004202424))
    split4_surface_8 = Shell.extrude(split4_surface_8_path.wire(), (0 * SPLIT4_SURFACE_8_DEPTH, 1 * SPLIT4_SURFACE_8_DEPTH, 0 * SPLIT4_SURFACE_8_DEPTH))
    split(bisect_by=split4_surface_8, keep=Keep.TOP)


with BuildPart() as body_7:
    # Mirror1: mirrored copy
    add(part_4.part.mirror(Plane(origin=(0, 0, 0), x_dir=(0, 0, 1), z_dir=(1, 0, 0))))


with BuildPart() as body_8:
    # Mirror1 2: mirrored copy
    add(body_2_1.part.mirror(Plane(origin=(0, 0, 0), x_dir=(0, 0, 1), z_dir=(1, 0, 0))))


with BuildPart() as body_9:
    # Mirror1 3: mirrored copy
    add(body_3.part.mirror(Plane(origin=(0, 0, 0), x_dir=(0, 0, 1), z_dir=(1, 0, 0))))


with BuildPart() as body_10:
    # Mirror1 4: mirrored copy
    add(body_4.part.mirror(Plane(origin=(0, 0, 0), x_dir=(0, 0, 1), z_dir=(1, 0, 0))))


with BuildPart() as body_11:
    # Mirror1 5: mirrored copy
    add(body_5_1.part.mirror(Plane(origin=(0, 0, 0), x_dir=(0, 0, 1), z_dir=(1, 0, 0))))


with BuildPart() as body_12:
    # Mirror1 6: mirrored copy
    add(body_6.part.mirror(Plane(origin=(0, 0, 0), x_dir=(0, 0, 1), z_dir=(1, 0, 0))))


solid = Compound([body_7.part, body_8.part, body_9.part, body_10.part, body_11.part, body_12.part])
